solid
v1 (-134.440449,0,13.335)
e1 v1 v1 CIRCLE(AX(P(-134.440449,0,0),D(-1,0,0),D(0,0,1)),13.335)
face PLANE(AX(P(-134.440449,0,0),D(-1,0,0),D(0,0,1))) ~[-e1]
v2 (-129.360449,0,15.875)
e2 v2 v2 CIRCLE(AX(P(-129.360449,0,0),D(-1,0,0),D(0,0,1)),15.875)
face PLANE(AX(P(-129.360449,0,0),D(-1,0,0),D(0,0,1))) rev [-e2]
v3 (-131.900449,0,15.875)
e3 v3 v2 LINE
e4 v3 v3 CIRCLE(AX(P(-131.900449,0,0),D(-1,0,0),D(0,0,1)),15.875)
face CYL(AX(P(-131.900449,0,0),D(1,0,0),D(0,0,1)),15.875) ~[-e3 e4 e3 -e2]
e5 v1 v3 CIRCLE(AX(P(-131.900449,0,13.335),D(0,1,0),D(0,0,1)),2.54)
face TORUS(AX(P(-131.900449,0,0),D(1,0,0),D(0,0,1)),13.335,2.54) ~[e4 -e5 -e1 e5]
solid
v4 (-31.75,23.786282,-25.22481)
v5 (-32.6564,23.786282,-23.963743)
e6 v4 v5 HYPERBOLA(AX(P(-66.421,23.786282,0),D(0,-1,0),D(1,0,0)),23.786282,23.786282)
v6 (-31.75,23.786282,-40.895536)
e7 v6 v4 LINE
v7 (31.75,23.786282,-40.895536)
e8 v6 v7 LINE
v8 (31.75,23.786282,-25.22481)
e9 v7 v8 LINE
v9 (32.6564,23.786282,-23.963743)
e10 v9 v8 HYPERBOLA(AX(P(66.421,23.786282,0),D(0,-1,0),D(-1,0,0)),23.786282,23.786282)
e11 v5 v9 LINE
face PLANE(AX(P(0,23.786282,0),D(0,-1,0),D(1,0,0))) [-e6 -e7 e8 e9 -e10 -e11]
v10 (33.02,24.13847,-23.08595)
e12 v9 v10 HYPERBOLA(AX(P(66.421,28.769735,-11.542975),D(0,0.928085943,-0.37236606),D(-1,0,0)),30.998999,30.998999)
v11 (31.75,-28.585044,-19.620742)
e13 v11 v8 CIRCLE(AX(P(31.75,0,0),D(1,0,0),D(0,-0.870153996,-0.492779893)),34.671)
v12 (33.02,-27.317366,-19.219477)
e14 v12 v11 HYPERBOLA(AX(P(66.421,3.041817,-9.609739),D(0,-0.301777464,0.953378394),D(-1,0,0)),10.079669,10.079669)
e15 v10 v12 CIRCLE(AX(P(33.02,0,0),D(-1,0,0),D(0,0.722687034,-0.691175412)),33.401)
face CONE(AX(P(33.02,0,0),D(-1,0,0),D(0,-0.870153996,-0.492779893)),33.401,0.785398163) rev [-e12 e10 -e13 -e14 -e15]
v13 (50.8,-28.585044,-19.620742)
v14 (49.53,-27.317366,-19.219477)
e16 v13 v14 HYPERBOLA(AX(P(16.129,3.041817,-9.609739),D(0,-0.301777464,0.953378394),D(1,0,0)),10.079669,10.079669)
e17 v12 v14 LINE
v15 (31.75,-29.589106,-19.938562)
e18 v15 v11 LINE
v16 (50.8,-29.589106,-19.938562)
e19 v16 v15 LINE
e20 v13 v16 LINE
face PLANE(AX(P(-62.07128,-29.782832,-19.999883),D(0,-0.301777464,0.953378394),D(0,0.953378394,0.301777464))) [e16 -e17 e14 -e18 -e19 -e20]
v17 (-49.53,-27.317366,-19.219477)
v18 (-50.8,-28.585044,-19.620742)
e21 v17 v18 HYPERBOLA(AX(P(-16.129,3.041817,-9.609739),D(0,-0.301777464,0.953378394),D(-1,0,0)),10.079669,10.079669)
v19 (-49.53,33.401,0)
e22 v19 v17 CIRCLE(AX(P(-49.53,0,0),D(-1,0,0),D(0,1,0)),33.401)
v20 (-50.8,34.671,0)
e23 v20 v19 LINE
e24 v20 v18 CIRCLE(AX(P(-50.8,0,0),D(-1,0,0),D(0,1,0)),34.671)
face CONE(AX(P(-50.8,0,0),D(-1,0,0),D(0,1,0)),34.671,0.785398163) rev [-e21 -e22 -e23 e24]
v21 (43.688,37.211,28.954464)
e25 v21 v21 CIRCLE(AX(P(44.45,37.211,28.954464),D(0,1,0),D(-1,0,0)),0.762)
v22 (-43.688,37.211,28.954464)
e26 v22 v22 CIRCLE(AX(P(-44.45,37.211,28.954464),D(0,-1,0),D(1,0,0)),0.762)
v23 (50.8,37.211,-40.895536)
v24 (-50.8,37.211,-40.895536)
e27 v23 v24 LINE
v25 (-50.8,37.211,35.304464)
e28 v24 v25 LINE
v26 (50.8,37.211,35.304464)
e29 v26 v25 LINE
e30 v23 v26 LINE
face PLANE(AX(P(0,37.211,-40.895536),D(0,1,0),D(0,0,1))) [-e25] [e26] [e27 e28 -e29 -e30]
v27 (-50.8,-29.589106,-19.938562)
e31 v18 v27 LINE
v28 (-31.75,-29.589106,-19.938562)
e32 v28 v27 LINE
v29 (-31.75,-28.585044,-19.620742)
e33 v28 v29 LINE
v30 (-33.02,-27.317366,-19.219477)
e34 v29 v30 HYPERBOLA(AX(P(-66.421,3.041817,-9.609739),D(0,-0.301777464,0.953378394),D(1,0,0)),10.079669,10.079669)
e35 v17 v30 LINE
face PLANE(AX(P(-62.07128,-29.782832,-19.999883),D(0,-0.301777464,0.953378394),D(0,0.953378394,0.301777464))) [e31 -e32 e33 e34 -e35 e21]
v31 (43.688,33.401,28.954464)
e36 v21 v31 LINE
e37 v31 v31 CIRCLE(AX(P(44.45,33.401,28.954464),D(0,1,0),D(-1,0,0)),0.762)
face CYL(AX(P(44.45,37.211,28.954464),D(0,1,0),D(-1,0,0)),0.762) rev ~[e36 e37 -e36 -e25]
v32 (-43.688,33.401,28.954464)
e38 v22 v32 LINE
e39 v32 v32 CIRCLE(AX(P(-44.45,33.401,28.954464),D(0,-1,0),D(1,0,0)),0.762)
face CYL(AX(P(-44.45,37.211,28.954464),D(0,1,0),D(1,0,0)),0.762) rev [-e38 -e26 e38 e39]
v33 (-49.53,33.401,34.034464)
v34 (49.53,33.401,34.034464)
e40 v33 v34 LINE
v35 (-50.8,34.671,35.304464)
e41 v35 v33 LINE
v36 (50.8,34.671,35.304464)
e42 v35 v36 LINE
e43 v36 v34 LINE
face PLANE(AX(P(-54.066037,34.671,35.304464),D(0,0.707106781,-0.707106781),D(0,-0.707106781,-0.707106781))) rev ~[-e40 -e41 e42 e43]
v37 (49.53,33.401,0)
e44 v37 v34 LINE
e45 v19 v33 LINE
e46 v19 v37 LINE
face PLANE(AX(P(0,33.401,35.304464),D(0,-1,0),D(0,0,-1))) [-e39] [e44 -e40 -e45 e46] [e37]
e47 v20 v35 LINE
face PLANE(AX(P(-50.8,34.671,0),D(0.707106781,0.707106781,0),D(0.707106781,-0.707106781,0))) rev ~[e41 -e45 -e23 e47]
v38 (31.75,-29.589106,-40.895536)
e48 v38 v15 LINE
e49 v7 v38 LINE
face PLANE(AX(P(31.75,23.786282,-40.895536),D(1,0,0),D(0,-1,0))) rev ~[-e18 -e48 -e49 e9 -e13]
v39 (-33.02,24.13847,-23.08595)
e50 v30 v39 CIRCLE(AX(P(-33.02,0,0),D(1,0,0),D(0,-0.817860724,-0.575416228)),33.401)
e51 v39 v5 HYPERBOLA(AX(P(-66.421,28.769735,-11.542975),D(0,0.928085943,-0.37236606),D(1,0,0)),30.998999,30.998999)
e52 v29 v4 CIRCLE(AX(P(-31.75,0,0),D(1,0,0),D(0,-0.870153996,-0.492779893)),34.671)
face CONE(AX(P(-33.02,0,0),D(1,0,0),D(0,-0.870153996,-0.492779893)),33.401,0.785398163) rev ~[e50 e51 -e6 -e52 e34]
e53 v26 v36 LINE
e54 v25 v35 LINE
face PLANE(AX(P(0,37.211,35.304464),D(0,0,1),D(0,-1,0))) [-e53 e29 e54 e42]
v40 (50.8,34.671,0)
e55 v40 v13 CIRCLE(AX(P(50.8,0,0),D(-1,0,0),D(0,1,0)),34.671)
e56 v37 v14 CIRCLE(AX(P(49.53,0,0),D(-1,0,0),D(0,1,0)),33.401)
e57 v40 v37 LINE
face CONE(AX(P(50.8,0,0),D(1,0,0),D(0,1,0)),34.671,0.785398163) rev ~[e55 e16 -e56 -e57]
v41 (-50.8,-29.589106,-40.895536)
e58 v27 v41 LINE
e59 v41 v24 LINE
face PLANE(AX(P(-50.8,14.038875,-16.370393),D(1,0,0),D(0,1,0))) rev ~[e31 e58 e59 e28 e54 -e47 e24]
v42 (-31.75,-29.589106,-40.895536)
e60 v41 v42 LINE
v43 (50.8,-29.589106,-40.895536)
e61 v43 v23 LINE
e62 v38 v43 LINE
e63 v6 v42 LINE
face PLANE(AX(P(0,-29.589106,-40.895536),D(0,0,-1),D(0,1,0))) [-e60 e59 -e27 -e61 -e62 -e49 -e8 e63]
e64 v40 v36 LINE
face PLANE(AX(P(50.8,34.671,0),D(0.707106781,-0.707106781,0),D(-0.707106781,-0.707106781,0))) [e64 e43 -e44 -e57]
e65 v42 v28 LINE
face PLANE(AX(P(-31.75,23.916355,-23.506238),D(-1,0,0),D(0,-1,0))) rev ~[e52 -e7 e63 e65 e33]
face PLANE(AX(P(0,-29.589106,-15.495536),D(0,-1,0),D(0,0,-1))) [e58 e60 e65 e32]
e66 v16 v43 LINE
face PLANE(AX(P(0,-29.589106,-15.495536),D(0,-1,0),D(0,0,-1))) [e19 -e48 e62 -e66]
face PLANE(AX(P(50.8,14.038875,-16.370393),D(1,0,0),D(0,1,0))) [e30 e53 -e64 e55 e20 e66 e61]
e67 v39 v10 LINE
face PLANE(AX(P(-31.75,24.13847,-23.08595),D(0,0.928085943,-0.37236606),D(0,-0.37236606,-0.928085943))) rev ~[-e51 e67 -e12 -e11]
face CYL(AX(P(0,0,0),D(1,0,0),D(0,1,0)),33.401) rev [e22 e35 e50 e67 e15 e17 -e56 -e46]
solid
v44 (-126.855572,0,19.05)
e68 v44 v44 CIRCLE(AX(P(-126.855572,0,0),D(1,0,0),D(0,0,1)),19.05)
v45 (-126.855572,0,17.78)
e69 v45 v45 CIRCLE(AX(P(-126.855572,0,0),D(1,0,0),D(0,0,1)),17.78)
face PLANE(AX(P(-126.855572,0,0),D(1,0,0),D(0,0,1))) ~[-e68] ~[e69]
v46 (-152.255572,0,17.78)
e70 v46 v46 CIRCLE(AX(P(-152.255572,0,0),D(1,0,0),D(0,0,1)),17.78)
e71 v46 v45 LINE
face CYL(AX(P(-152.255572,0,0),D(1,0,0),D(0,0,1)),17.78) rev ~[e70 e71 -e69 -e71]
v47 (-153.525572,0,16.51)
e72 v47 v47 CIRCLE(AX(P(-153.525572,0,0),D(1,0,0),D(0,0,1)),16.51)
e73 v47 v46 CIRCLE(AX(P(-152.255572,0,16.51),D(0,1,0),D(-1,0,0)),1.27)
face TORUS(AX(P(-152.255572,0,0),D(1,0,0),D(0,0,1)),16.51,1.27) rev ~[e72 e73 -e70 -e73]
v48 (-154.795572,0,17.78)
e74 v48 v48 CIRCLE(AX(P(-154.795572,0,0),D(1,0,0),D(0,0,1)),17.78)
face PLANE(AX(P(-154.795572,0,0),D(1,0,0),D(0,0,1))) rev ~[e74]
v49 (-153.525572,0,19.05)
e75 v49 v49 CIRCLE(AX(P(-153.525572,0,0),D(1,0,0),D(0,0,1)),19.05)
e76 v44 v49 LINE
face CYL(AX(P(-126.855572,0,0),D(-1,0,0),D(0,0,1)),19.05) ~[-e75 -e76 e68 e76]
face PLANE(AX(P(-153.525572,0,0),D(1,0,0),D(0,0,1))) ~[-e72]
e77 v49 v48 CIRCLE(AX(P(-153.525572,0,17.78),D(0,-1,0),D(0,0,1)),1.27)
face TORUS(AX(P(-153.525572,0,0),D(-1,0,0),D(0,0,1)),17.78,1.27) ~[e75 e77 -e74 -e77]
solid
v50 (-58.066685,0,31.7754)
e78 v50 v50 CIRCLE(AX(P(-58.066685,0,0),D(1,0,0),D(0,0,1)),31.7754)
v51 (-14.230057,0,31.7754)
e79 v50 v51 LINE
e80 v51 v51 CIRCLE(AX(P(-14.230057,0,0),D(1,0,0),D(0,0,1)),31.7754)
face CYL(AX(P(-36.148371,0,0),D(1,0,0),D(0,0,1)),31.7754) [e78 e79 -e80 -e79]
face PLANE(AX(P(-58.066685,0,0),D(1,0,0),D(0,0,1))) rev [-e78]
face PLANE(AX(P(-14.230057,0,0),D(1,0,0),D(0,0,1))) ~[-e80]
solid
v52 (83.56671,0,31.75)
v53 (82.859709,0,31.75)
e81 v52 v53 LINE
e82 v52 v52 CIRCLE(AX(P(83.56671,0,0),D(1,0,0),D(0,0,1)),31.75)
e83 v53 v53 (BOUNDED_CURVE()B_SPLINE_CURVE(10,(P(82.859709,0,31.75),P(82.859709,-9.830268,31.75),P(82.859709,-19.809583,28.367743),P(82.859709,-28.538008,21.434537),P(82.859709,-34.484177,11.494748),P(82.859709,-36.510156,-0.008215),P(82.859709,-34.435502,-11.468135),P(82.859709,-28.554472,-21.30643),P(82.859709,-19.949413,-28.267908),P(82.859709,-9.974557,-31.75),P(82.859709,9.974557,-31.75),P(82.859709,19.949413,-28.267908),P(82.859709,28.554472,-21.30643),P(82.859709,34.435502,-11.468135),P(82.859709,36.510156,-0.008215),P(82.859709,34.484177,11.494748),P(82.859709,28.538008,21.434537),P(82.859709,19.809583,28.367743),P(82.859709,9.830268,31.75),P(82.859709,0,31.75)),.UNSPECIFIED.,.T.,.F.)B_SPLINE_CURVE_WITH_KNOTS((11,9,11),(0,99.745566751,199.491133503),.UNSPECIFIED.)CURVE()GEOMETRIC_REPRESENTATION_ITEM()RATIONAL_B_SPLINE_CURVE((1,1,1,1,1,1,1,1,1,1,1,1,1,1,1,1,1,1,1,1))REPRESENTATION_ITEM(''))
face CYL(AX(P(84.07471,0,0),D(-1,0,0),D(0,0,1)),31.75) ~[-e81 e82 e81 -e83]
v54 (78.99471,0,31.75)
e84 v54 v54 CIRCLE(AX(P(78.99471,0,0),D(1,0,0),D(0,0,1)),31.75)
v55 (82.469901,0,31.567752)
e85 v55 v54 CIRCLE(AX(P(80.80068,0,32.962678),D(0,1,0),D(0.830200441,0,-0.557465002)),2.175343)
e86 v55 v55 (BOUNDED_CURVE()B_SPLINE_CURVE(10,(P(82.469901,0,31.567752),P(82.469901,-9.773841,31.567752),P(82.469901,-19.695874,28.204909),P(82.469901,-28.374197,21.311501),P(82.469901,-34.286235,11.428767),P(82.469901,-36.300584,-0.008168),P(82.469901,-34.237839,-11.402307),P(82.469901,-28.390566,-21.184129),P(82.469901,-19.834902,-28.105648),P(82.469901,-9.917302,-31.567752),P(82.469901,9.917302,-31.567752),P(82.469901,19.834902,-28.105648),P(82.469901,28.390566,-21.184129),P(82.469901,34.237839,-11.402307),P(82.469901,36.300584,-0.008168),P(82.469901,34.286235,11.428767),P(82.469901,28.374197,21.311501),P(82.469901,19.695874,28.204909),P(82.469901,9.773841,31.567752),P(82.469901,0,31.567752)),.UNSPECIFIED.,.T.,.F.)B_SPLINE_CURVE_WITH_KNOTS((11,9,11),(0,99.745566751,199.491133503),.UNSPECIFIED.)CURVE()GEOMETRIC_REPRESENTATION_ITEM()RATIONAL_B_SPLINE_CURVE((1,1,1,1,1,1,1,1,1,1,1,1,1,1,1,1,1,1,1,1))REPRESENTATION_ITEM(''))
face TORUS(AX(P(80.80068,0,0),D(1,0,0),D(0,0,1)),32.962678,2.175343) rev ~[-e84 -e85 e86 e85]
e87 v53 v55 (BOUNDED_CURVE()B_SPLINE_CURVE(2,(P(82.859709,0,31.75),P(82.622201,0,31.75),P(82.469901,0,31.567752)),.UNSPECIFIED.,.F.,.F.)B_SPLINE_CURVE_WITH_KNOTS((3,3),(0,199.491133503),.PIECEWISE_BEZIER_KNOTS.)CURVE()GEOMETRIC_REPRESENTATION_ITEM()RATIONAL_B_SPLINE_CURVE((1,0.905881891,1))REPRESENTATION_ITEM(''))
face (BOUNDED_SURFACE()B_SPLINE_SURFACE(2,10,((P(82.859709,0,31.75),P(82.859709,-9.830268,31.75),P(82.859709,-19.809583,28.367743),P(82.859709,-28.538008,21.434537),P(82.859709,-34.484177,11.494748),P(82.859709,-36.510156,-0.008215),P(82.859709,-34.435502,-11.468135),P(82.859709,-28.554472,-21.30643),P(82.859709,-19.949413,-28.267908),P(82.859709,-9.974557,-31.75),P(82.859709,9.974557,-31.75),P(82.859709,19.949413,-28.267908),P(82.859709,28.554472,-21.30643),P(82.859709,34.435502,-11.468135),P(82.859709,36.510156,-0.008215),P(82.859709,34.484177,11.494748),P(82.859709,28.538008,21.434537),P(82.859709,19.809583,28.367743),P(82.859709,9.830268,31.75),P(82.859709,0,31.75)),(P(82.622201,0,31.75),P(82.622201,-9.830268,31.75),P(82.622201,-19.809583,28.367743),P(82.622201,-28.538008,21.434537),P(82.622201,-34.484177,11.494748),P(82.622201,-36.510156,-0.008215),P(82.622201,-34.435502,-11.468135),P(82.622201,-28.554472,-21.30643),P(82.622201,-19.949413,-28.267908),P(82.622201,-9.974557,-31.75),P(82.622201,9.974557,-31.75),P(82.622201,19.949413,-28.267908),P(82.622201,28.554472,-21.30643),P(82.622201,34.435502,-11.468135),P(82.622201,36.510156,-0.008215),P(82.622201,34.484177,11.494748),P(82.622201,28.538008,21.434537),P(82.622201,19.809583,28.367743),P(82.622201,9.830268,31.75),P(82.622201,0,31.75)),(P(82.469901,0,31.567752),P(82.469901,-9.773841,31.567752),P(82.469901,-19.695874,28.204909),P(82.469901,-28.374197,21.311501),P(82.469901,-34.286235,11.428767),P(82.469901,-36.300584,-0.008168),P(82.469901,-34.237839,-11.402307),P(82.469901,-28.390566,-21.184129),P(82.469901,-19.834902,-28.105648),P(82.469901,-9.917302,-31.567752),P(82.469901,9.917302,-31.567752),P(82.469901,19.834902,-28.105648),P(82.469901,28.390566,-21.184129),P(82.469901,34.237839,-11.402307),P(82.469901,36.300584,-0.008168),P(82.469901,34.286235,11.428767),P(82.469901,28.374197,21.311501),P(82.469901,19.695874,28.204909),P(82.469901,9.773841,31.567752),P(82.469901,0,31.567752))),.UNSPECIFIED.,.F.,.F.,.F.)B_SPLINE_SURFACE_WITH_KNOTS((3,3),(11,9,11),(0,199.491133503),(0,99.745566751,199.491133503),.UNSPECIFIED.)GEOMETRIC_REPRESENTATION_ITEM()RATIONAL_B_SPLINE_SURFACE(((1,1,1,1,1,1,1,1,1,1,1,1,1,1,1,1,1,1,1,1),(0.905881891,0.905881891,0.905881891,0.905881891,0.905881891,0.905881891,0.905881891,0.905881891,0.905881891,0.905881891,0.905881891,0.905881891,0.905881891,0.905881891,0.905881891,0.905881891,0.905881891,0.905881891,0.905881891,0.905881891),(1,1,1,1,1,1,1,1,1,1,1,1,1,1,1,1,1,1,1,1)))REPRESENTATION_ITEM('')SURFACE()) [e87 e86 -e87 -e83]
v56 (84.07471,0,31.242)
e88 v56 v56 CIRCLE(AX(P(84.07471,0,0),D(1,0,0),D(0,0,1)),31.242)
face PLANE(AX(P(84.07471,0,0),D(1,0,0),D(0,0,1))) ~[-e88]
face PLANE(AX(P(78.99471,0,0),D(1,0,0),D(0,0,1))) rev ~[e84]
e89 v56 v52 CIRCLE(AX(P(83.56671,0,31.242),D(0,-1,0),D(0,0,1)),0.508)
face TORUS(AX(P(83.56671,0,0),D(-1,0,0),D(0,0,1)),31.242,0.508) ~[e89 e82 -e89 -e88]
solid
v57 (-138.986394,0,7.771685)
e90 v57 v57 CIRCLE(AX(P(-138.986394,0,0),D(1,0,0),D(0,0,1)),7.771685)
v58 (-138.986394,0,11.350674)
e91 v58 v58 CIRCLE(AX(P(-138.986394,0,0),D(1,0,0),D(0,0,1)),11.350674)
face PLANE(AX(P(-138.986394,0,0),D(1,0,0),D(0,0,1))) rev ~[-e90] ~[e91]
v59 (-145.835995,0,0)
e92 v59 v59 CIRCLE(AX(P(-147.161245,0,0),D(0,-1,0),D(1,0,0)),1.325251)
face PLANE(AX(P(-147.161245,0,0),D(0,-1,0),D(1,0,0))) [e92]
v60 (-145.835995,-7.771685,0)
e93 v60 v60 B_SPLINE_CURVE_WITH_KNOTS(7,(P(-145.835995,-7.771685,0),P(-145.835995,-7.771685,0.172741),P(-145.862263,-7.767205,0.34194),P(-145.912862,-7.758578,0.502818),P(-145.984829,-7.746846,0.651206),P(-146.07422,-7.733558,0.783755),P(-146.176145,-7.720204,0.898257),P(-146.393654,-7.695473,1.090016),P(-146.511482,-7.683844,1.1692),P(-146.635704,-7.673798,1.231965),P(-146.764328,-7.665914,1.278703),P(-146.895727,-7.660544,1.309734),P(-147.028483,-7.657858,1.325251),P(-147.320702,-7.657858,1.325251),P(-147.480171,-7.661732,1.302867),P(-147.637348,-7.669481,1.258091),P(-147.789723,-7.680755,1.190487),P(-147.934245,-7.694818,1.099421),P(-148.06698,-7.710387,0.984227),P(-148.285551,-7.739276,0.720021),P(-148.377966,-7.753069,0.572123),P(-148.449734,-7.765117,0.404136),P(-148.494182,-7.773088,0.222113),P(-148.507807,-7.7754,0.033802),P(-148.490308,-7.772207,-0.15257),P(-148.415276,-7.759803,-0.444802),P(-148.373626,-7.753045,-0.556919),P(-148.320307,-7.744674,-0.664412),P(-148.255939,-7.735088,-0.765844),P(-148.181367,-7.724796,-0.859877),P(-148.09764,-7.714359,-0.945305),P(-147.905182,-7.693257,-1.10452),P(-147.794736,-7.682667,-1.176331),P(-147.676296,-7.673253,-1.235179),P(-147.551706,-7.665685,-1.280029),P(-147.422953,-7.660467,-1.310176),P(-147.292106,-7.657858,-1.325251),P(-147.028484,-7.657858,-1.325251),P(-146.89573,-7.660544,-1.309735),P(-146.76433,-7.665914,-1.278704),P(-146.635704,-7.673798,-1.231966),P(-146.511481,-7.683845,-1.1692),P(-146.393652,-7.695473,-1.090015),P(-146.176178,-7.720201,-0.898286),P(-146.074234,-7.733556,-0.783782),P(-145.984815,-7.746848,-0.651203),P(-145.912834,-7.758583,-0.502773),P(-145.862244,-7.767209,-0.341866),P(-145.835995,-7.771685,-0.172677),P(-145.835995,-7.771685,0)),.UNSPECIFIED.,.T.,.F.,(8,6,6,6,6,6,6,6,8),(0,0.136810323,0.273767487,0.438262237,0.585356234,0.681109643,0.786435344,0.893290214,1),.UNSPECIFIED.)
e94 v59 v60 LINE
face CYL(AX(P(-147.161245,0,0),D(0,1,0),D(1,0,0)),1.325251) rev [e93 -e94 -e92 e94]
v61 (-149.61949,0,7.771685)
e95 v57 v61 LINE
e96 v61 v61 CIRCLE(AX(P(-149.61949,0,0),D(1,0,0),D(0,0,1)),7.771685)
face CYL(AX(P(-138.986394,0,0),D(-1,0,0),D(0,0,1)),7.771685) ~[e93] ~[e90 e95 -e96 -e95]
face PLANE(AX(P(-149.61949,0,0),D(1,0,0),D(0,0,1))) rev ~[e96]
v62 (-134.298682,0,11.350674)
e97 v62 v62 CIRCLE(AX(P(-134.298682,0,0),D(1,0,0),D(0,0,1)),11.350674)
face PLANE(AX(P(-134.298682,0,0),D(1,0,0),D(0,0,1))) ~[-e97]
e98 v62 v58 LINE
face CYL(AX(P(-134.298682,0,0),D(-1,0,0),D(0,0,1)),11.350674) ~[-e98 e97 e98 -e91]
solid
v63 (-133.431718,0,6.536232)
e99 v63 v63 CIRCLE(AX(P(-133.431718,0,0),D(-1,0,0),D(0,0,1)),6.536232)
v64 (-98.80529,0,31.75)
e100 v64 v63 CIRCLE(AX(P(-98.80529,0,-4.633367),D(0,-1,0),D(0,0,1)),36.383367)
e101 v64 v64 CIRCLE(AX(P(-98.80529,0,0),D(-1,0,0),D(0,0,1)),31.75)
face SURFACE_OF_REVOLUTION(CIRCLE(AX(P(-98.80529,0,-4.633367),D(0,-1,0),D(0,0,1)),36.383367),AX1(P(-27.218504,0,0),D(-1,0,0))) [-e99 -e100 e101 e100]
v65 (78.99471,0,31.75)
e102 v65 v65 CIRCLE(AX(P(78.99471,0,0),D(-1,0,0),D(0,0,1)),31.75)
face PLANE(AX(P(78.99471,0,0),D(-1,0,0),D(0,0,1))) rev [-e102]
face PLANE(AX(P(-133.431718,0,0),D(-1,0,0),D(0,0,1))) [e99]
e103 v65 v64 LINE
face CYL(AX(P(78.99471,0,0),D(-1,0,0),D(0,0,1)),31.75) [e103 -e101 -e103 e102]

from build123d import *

# Parameters (mm, degrees)
F1_DEPTH     = 50.8
F2_T1_DEPTH  = 124.1425594427
F3_W         = 63.5
F3_H         = 53.3753879368
F4_DEPTH     = 25.4
F5_T1_DEPTH  = 63.5
F5_T3_DEPTH  = 108.1320747894
F5_T5_DEPTH  = 38.570501885
F5_T10_ANGLE = 111.4913949057
F5_T15_ANGLE = 111.4913949057
F5_T18_ANGLE = 150.4795795225
F5_T20_ANGLE = 150.4795795225
F5_T25_DEPTH = 64.906372973
F5_T29_ANGLE = 111.4913949057
F5_T36_ANGLE = 111.4913949057
F5_T40_DEPTH = 64.906372973
F6_R         = 0.762
F7_DEPTH     = 3.81
F10_W        = 5.08
F10_H        = 15.875
F14_R        = 2.54
F19_R        = 0.508
F20_R        = 1.3252507726
F21_DEPTH    = 25.4
F22_W        = 43.8366280696
F22_H        = 31.7754


# Not quite as in the source:
# - a fillet or chamfer that OpenCascade refuses, or shapes differently, is made with other operations: its cross-section is extruded or revolved along the edge and cut away or added
# - a pattern or mirror of a feature is missing from the dataset's text; its kind, count and spacing are read off the source's solid


with BuildPart() as f1:
    # F0 (on Right) → F1 (new body, symmetric)
    with BuildSketch(Plane.YZ):
        with BuildLine():
            Line((33.401, 35.3044644903), (33.401, 0))
            ThreePointArc((33.401, 0), (7.9787555162, -32.4340293737), (-29.58910577, -15.4955355097))
            Line((-29.58910577, -15.4955355097), (-29.58910577, -40.8955355097))
            Line((-29.58910577, -40.8955355097), (37.211, -40.8955355097))
            Line((37.211, -40.8955355097), (37.211, 35.3044644903))
            Line((37.211, 35.3044644903), (33.401, 35.3044644903))
        make_face()
    extrude(amount=F1_DEPTH, both=True)

    # F2: chamfer of 5.08 on 1 edges, made by hand

    # F2_s2 → F2_t1 (cut)
    with BuildSketch(Plane.YZ.offset(-62.0712797213)):
        with BuildLine():
            Line((-29.7828322597, -19.9998833533), (-27.1236395633, -19.1581562557))
            Line((-27.1236395633, -19.1581562557), (-27.0405449137, -19.0996939669))
            ThreePointArc((-27.0405449137, -19.0996939669), (-28.414686405, -17.3624778434), (-29.4991008855, -15.4484008009))
            Line((-29.4991008855, -15.4484008009), (-29.69070577, -15.4955355097))
            ThreePointArc((-29.69070577, -15.4955355097), (-29.69070577, -17.7477094315), (-29.8844322597, -19.9998833533))
            Line((-29.8844322597, -19.9998833533), (-29.7828322597, -19.9998833533))
        make_face()
    extrude(amount=F2_T1_DEPTH, mode=Mode.SUBTRACT)

    # F3 (on face) → F4 (cut)
    with BuildSketch(Plane(origin=(0, 0, -40.8955355097), x_dir=(1, 0, 0), z_dir=(0, 0, -1))):
        with Locations((0, 2.9014118016)):
            Rectangle(F3_W, F3_H)
    extrude(amount=-F4_DEPTH, mode=Mode.SUBTRACT)

    # F5: chamfer of 1.27 on 8 edges, made by hand

    # F5_s2 → F5_t1 (cut)
    with BuildSketch(Plane.YZ.offset(-31.75)):
        with BuildLine():
            Line((24.1384696333, -23.0859499429), (23.7862821668, -23.9637427164))
            Line((23.7862821668, -23.9637427164), (23.7862821668, -23.4486584196))
            ThreePointArc((23.7862821668, -23.4486584196), (23.9794328881, -23.2510988852), (24.1384696333, -23.0859499429))
        make_face()
    extrude(amount=F5_T1_DEPTH, mode=Mode.SUBTRACT)

    # F5_s4 → F5_t3 (cut)
    with BuildSketch(Plane.YZ.offset(-54.0660373947)):
        Polygon((34.671, 35.3044644903), (33.401, 34.0344644903), (33.401, 35.3044644903), align=None)
    extrude(amount=F5_T3_DEPTH, mode=Mode.SUBTRACT)

    # F5_s6 → F5_t5 (cut)
    with BuildSketch(Plane.XY):
        Polygon((-50.8, 34.671), (-49.53, 33.401), (-50.8, 33.401), align=None)
        Polygon((50.8, 34.671), (49.53, 33.401), (50.8, 33.401), align=None)
    extrude(amount=F5_T5_DEPTH, mode=Mode.SUBTRACT)


with BuildPart() as f5_tool8:
    # F5_s9 → F5_t10 (revolve)
    with BuildSketch(Plane(origin=(0, 0, 0), x_dir=(1, 0, 0), z_dir=(0, -0.4927798926, 0.8701539964))):
        Polygon((-33.02, -33.401), (-31.75, -34.671), (-31.75, -33.401), align=None)
    revolve(axis=Axis((-31.75, 0, 0), (1, 0, 0)), revolution_arc=F5_T10_ANGLE)

    split(bisect_by=Plane.XZ.offset(-23.7862821668), keep=Keep.TOP)


with BuildPart() as f1_1:
    add(f1.part)

    # F5_t7: cut F5_tool8
    add(f5_tool8.part, mode=Mode.SUBTRACT)


with BuildPart() as f5_tool13:
    # F5_s14 → F5_t15 (revolve)
    with BuildSketch(Plane(origin=(0, 0, 0), x_dir=(1, 0, 0), z_dir=(0, -0.4927798926, 0.8701539964))):
        Polygon((33.02, -33.401), (31.75, -34.671), (31.75, -33.401), align=None)
    revolve(axis=Axis((31.75, 0, 0), (1, 0, 0)), revolution_arc=F5_T15_ANGLE)

    split(bisect_by=Plane.XZ.offset(-23.7862821668), keep=Keep.TOP)


with BuildPart() as f1_2:
    add(f1_1.part)

    # F5_t12: cut F5_tool13
    add(f5_tool13.part, mode=Mode.SUBTRACT)

    # F5_s17 → F5_t18 (revolve, cut)
    with BuildSketch(Plane.XY):
        Polygon((50.8, 34.671), (49.53, 33.401), (50.8, 33.401), align=None)
    revolve(axis=Axis((50.8, 0, 0), (-1, 0, 0)), revolution_arc=F5_T18_ANGLE, mode=Mode.SUBTRACT)

    # F5_s19 → F5_t20 (revolve, cut)
    with BuildSketch(Plane.XY):
        Polygon((-50.8, 34.671), (-49.53, 33.401), (-50.8, 33.401), align=None)
    revolve(axis=Axis((-50.8, 0, 0), (-1, 0, 0)), revolution_arc=F5_T20_ANGLE, mode=Mode.SUBTRACT)


with BuildPart() as f5_tool23:
    # F5_s24 → F5_t25 (new body)
    with BuildSketch(Plane.YZ.offset(-33.156372973)):
        with BuildLine():
            Line((24.1384696333, -23.0859499429), (23.7862821668, -23.9637427164))
            Line((23.7862821668, -23.9637427164), (23.7862821668, -23.4486584196))
            ThreePointArc((23.7862821668, -23.4486584196), (23.9794328881, -23.2510988852), (24.1384696333, -23.0859499429))
        make_face()
    extrude(amount=F5_T25_DEPTH)

    split(bisect_by=Plane.YZ.offset(-31.75), keep=Keep.BOTTOM)


with BuildPart() as f5_tool27:
    # F5_s28 → F5_t29 (revolve)
    with BuildSketch(Plane(origin=(0, 0, 0), x_dir=(1, 0, 0), z_dir=(0, -0.4927798926, 0.8701539964))):
        Polygon((-33.02, -33.401), (-31.75, -34.671), (-31.75, -33.401), align=None)
    revolve(axis=Axis((-31.75, 0, 0), (1, 0, 0)), revolution_arc=F5_T29_ANGLE)

    split(bisect_by=Plane.XZ.offset(-23.7862821668), keep=Keep.BOTTOM)


with BuildPart() as f5_tool23_1:
    add(f5_tool23.part)

    # F5_t31: intersect F5_tool27
    add(f5_tool27.part, mode=Mode.INTERSECT)


with BuildPart() as f1_3:
    add(f1_2.part)

    # F5_t21: cut F5_tool23
    add(f5_tool23_1.part, mode=Mode.SUBTRACT)


with BuildPart() as f5_tool34:
    # F5_s35 → F5_t36 (revolve)
    with BuildSketch(Plane(origin=(0, 0, 0), x_dir=(1, 0, 0), z_dir=(0, -0.4927798926, 0.8701539964))):
        Polygon((33.02, -33.401), (31.75, -34.671), (31.75, -33.401), align=None)
    revolve(axis=Axis((31.75, 0, 0), (1, 0, 0)), revolution_arc=F5_T36_ANGLE)

    split(bisect_by=Plane.XZ.offset(-23.7862821668), keep=Keep.BOTTOM)


with BuildPart() as f5_tool38:
    # F5_s39 → F5_t40 (new body)
    with BuildSketch(Plane.YZ.offset(-31.75)):
        with BuildLine():
            Line((24.1384696333, -23.0859499429), (23.7862821668, -23.9637427164))
            Line((23.7862821668, -23.9637427164), (23.7862821668, -23.4486584196))
            ThreePointArc((23.7862821668, -23.4486584196), (23.9794328881, -23.2510988852), (24.1384696333, -23.0859499429))
        make_face()
    extrude(amount=F5_T40_DEPTH)

    split(bisect_by=Plane.YZ.offset(31.75), keep=Keep.TOP)


with BuildPart() as f5_tool34_1:
    add(f5_tool34.part)

    # F5_t42: intersect F5_tool38
    add(f5_tool38.part, mode=Mode.INTERSECT)


with BuildPart() as f1_4:
    add(f1_3.part)

    # F5_t32: cut F5_tool34
    add(f5_tool34_1.part, mode=Mode.SUBTRACT)

    # F6 (on face) → F7 (cut, through all)
    with BuildSketch(Plane(origin=(0, 37.211, 0), x_dir=(-1, 0, 0), z_dir=(0, 1, 0))):
        with Locations((-44.45, 28.9544644903)):
            Circle(F6_R)
    f7 = extrude(amount=-F7_DEPTH, mode=Mode.SUBTRACT)

    # F7_copies: F7 across plane
    add(f7.mirror(Plane(origin=(0, 0, 0), x_dir=(0, 0, -1), z_dir=(-1, 0, 0))), mode=Mode.SUBTRACT)


with BuildPart() as f9:
    # F8 (on Front) → F9 (revolve)
    with BuildSketch(Plane.XZ):
        with BuildLine():
            Line((-133.4317177534, 0), (78.9947096897, 0))
            Line((78.9947096897, 0), (78.9947096897, 31.75))
            Line((78.9947096897, 31.75), (-98.8052903103, 31.75))
            ThreePointArc((-98.8052903103, 31.75), (-120.222127041, 24.7786799307), (-133.4317177534, 6.5362318419))
            Line((-133.4317177534, 6.5362318419), (-133.4317177534, 0))
        make_face()
    revolve(axis=Axis((-27.2185040319, 0, 0), (-1, 0, 0)))


with BuildPart() as f11:
    # F10 (on Front) → F11 (revolve)
    with BuildSketch(Plane.XZ):
        with Locations((-131.9004494365, 7.9375)):
            Rectangle(F10_W, F10_H)
    revolve(axis=Axis((-131.9004494365, 0, 0), (-1, 0, 0)))

    # F14
    f14_edges = [f11.edges().sort_by_distance(p)[0] for p in [
        (-134.440449, 0, -15.875),
    ]]
    fillet(f14_edges, radius=F14_R)


with BuildPart() as f13:
    # F12 (on Front) → F13 (revolve)
    with BuildSketch(Plane.XZ):
        Polygon((-138.9863938093, 0), (-134.2986822128, 0), (-134.2986822128, 11.3506736234), (-138.9863938093, 11.3506736234), (-138.9863938093, 7.7716847882), (-149.6194899082, 7.7716847882), (-149.6194899082, 0), align=None)
    revolve(axis=Axis((-144.3029418588, 0, 0), (1, 0, 0)))

    # F20 (on Front) → F21 (cut)
    with BuildSketch(Plane.XZ):
        with Locations((-147.1612453461, 0)):
            Circle(F20_R)
    extrude(amount=F21_DEPTH, mode=Mode.SUBTRACT)


with BuildPart() as f16:
    # F15 (on Front) → F16 (revolve)
    with BuildSketch(Plane.XZ):
        with BuildLine():
            Line((-154.7955721617, 17.78), (-154.7955721617, 0))
            Line((-154.7955721617, 0), (-153.5255721617, 0))
            Line((-153.5255721617, 0), (-153.5255721617, 16.51))
            ThreePointArc((-153.5255721617, 16.51), (-153.1535977738, 17.4080256121), (-152.2555721617, 17.78))
            Line((-152.2555721617, 17.78), (-126.8555721617, 17.78))
            Line((-126.8555721617, 17.78), (-126.8555721617, 19.05))
            Line((-126.8555721617, 19.05), (-153.5255721617, 19.05))
            ThreePointArc((-153.5255721617, 19.05), (-154.4235977738, 18.6780256121), (-154.7955721617, 17.78))
        make_face()
    revolve(axis=Axis((-154.1605721617, 0, 0), (1, 0, 0)))


with BuildPart() as f18:
    # F17 (on Front) → F18 (revolve)
    with BuildSketch(Plane.XZ):
        with BuildLine():
            Line((78.9947096897, 31.75), (78.9947096897, 0))
            Line((78.9947096897, 0), (84.0747096897, 0))
            Line((84.0747096897, 0), (84.0747096897, 31.75))
            Line((84.0747096897, 31.75), (82.6066508889, 31.75))
            ThreePointArc((82.6066508889, 31.75), (80.8006802893, 30.7873346522), (78.9947096897, 31.75))
        make_face()
    revolve(axis=Axis((81.5347096897, 0, 0), (1, 0, 0)))

    # F19
    f19_edges = [f18.edges().sort_by_distance(p)[0] for p in [
        (82.606651, 0, -31.75),
        (84.07471, 0, -31.75),
    ]]
    fillet(f19_edges, radius=F19_R)


with BuildPart() as f23:
    # F22 (on Front) → F23 (revolve)
    with BuildSketch(Plane.XZ):
        with Locations((-36.1483705929, 15.8877)):
            Rectangle(F22_W, F22_H)
    revolve(axis=Axis((-36.1483705929, 0, 0), (1, 0, 0)))


solid = Compound([f1_4.part, f9.part, f11.part, f13.part, f16.part, f18.part, f23.part])
